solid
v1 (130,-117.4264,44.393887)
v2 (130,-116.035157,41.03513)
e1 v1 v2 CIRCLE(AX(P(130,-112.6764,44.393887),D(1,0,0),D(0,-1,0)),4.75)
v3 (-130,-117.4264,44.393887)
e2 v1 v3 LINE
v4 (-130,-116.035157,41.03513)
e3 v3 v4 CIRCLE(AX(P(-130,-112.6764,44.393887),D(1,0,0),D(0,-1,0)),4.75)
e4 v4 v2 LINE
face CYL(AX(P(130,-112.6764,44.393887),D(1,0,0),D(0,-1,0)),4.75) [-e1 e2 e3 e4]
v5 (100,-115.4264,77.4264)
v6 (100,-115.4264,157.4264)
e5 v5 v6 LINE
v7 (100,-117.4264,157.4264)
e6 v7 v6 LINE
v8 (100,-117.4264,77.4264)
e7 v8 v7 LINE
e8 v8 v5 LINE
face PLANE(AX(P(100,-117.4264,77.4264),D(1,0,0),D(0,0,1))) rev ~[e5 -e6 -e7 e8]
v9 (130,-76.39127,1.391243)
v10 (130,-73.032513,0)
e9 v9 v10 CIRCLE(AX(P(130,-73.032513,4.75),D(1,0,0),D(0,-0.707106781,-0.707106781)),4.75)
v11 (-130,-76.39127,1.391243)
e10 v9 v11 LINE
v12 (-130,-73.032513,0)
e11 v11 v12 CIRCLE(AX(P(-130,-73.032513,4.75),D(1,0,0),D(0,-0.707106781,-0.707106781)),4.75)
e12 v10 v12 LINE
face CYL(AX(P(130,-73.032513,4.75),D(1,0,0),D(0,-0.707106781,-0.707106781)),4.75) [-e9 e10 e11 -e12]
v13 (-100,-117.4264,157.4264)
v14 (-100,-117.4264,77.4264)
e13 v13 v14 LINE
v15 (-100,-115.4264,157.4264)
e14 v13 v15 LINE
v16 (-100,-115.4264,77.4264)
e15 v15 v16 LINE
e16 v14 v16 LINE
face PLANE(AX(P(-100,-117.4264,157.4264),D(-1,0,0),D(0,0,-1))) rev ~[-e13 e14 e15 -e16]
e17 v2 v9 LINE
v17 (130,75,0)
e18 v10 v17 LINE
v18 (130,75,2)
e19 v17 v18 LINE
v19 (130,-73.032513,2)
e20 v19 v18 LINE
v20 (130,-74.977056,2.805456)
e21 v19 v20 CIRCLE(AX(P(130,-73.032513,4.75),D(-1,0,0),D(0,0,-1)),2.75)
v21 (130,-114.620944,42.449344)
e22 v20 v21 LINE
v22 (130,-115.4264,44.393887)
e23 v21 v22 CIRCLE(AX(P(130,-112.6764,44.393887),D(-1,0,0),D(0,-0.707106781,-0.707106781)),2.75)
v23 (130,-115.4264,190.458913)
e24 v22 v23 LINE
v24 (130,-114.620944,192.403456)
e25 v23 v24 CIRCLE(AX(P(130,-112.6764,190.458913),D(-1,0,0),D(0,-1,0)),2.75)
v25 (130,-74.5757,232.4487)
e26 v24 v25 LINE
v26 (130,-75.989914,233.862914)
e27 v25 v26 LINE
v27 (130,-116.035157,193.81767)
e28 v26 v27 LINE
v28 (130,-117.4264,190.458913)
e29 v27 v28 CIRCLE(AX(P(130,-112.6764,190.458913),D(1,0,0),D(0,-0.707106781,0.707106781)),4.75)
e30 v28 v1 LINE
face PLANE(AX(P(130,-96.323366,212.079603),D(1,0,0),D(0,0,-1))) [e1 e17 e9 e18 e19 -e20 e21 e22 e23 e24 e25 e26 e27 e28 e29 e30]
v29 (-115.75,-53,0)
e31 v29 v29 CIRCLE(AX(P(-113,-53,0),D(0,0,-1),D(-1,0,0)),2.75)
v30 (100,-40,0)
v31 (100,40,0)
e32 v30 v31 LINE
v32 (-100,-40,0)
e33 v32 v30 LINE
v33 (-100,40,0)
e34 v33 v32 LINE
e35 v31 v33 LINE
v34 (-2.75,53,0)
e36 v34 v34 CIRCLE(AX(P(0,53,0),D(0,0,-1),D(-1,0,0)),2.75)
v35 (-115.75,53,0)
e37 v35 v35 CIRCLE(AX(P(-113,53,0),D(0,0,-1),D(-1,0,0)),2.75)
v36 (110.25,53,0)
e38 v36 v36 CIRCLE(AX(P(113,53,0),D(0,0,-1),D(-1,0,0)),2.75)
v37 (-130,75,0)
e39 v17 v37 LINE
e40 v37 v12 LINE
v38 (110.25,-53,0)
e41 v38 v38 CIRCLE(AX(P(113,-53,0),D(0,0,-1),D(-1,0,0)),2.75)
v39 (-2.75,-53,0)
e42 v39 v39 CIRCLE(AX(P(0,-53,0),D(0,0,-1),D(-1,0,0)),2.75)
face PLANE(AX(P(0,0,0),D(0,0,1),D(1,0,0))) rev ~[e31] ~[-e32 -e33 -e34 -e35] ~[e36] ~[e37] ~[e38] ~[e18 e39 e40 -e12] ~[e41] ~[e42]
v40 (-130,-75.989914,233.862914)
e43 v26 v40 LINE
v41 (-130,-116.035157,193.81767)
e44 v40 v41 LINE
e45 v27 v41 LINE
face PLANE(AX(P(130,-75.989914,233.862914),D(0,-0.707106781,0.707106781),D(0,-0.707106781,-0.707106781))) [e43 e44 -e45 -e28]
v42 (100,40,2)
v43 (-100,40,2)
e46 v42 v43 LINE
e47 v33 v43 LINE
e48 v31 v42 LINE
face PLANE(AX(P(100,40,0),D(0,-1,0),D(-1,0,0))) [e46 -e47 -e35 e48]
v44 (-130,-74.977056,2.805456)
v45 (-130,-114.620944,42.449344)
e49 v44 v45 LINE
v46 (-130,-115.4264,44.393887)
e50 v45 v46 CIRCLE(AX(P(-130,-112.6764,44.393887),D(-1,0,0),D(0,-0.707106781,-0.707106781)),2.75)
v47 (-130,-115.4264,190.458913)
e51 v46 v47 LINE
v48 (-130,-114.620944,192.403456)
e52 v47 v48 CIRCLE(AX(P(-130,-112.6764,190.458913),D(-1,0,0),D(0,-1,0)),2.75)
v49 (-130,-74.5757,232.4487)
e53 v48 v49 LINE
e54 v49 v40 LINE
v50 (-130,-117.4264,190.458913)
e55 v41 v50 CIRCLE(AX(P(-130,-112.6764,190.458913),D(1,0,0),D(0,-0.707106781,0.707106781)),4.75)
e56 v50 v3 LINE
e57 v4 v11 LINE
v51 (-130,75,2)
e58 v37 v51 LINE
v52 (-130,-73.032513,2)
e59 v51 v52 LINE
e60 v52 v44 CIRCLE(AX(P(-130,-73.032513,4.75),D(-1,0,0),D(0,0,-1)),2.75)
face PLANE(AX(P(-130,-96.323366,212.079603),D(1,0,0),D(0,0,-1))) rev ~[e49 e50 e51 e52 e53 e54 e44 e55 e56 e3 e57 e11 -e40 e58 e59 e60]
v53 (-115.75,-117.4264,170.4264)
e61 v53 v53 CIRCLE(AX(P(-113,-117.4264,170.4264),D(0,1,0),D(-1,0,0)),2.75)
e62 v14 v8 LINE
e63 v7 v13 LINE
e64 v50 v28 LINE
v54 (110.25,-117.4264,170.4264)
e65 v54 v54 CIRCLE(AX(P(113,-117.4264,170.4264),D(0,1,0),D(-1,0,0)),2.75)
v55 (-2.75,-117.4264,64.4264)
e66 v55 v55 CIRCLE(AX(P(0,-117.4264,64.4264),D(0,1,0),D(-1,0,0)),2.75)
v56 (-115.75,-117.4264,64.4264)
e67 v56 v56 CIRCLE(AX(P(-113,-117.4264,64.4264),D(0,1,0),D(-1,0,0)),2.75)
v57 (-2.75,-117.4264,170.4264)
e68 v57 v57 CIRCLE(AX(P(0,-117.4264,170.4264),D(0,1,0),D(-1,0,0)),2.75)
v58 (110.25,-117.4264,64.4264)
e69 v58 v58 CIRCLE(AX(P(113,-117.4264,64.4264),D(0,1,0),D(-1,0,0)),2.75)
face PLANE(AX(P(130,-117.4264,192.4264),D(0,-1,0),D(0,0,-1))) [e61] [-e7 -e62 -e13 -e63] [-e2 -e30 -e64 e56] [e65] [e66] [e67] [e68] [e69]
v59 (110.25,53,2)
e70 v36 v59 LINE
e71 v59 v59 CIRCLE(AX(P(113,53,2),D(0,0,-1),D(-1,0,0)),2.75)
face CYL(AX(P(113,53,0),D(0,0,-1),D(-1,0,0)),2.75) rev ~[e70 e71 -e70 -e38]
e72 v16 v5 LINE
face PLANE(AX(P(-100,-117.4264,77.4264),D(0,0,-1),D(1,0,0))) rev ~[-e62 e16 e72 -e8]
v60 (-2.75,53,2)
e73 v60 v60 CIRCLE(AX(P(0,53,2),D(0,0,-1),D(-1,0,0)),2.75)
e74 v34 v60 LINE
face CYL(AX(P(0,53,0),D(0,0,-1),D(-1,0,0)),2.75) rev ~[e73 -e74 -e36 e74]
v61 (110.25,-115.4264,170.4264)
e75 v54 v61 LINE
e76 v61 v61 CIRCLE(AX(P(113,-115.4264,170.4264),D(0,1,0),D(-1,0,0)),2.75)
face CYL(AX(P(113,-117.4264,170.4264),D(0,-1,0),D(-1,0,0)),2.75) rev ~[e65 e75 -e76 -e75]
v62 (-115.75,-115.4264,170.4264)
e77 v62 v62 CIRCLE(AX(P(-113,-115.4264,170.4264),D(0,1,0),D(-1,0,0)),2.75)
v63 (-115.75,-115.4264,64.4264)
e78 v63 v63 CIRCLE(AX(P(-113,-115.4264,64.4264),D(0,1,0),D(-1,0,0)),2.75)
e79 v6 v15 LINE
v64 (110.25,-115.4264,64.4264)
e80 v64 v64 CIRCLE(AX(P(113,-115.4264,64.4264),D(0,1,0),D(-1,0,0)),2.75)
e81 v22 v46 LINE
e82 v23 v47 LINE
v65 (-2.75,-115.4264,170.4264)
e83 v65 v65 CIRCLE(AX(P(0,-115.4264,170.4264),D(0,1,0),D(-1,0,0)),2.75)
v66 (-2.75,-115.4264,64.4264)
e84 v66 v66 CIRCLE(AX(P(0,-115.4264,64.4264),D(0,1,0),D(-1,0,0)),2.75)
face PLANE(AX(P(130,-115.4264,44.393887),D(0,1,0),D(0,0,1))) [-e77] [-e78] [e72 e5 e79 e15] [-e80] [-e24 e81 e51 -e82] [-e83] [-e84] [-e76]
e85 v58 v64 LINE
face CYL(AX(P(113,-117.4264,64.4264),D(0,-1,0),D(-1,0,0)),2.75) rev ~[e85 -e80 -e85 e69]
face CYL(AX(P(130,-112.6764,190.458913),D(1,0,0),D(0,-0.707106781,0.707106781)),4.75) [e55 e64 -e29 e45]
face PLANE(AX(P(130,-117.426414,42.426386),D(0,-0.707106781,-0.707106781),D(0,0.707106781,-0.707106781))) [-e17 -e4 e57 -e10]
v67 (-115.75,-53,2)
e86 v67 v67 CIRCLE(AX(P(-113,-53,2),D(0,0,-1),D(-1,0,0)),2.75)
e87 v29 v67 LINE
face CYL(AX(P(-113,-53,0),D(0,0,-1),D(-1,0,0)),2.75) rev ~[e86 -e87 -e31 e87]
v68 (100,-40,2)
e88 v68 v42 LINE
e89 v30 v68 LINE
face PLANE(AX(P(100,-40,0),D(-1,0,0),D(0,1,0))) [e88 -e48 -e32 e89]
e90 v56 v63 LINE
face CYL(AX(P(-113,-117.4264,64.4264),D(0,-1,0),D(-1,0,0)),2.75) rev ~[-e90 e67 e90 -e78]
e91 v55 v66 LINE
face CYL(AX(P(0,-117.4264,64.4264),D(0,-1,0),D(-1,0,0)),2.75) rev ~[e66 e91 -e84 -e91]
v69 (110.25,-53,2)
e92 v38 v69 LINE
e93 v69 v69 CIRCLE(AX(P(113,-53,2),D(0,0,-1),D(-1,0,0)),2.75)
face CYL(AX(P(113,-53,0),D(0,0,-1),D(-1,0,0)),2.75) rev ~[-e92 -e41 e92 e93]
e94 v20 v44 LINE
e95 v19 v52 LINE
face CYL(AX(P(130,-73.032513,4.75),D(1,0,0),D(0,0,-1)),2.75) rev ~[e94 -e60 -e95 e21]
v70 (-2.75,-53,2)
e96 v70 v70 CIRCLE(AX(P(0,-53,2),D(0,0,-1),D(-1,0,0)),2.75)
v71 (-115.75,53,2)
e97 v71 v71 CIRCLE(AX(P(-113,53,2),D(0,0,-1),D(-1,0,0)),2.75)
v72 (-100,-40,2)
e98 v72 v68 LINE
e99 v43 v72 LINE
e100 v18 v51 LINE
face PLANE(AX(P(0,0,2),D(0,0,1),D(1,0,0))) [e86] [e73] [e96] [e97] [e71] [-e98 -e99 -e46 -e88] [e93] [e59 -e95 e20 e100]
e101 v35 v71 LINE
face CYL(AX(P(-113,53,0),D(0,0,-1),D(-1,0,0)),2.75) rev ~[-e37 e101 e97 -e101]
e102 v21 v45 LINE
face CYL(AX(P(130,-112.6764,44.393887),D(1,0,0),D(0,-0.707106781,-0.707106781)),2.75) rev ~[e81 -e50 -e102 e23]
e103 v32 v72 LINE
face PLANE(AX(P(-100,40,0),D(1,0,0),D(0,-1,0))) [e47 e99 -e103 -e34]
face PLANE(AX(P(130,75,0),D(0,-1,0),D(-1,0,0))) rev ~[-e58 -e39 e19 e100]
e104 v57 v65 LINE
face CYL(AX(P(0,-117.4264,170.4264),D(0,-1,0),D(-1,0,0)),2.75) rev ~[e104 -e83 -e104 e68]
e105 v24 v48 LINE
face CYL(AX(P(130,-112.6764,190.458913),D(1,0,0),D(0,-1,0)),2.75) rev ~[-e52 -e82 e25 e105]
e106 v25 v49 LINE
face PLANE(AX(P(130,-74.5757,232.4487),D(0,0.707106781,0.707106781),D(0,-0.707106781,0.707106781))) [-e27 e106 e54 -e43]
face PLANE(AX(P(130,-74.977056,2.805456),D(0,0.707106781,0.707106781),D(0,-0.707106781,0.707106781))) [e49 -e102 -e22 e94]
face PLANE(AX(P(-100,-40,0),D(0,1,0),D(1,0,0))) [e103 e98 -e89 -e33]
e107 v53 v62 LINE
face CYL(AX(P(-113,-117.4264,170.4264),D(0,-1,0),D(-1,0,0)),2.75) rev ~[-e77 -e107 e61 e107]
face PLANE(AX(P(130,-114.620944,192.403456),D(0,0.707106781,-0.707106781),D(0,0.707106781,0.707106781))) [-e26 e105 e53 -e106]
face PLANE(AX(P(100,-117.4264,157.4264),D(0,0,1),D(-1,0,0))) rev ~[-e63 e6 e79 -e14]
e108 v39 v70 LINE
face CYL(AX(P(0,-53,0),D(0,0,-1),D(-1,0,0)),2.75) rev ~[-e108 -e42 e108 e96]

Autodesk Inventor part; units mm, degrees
ref_plane "YZ Plane" through (0, 0, 0) normal (1, 0, 0) x (0, 1, 0)
ref_plane "XZ Plane" through (0, 0, 0) normal (0, 1, 0) x (-1, 0, 0)
sketch "Sketch1" plane through (0, 0, 0) normal (0, 0, 1) x (1, 0, 0)
  line L0 (130, 75) -> (-130, 75)
  line L1 (-130, 75) -> (-130, -75)
  line L2 (-130, -75) -> (130, -75)
  line L3 (130, -75) -> (130, 75)
  line L4 (130, 75) -> (-130, -75) construction
  line L5 (-130, 75) -> (130, -75) construction
  line L6 (100, 40) -> (-100, 40)
  line L7 (-100, 40) -> (-100, -40)
  line L8 (-100, -40) -> (100, -40)
  line L9 (100, -40) -> (100, 40)
  line L10 (100, 40) -> (-100, -40) construction
  line L11 (-100, 40) -> (100, -40) construction
  point P0 (0, 0)
  point P1 (0, 0)
  point P2 (0, 0)
  point P3 (100, 0)
  point P4 (130, 0)
  dimension "d34" = 200
  dimension "d35" = 80
  dimension "d51" = 30
  dimension "d53" = 30
  dimension "d54" = 35
  dimension "d56" = 150
extrude "Plate1" add sketch "Sketch1" along normal blind 2
sketch "Sketch6" plane through (130, -73.5858, 1.4142) normal (0, -0.7071068, -0.7071068) x (1, 0, 0)
  line L0 (-260, 0) -> (0, 0)
  line L1 (0, 0) -> (0, 60)
  line L2 (0, 60) -> (-260, 60)
  line L3 (-260, 60) -> (-260, 0)
edge flange "Flange2" height 60 angle 45 thickness 2 bend radius 2.75 thickness toward (0, -0.7071068, -0.7071068) relief round relief width 2 relief depth 1 edges at (0, -75, 2) wall of the first edge with corners at (-130, -73.5858, 1.4142) (130, -73.5858, 1.4142) (130, -116.0122, 43.8406) (-130, -116.0122, 43.8406)
bend "Bend2"
corner "Corner2"
sketch "Sketch8" plane through (130, -115.4264, 42.4264) normal (0, -1, 0) x (1, 0, 0)
  line L0 (-260, 0) -> (0, 0)
  line L1 (0, 0) -> (0, 150)
  line L2 (0, 150) -> (-260, 150)
  line L3 (-260, 150) -> (-260, 0)
edge flange "Flange3" height 150 angle 45 thickness 2 bend radius 2.75 thickness toward (0, -1, 0) relief round relief width 2 relief depth 1 edges at (0, -116.0122, 43.8406) wall of the first edge with corners at (-130, -115.4264, 42.4264) (130, -115.4264, 42.4264) (130, -115.4264, 192.4264) (-130, -115.4264, 192.4264)
bend "Bend3"
corner "Corner3"
sketch "Sketch9" plane through (130, -116.0122, 191.0122) normal (0, -0.7071068, 0.7071068) x (1, 0, 0)
  line L0 (-260, 0) -> (0, 0)
  line L1 (0, 0) -> (0, 58.6)
  line L2 (0, 58.6) -> (-260, 58.6)
  line L3 (-260, 58.6) -> (-260, 0)
edge flange "Flange4" height 58.6 angle 45 thickness 2 bend radius 2.75 thickness toward (0, -0.7071068, 0.7071068) relief round relief width 2 relief depth 1 edges at (0, -115.4264, 192.4264) wall of the first edge with corners at (-130, -116.0122, 191.0122) (130, -116.0122, 191.0122) (130, -74.5757, 232.4487) (-130, -74.5757, 232.4487)
bend "Bend4"
corner "Corner4"
sketch "Sketch10" plane through (-130, -117.4264, 44.3939) normal (0, -1, 0) x (1, 0, 0)
  line L0 (260, 146.065) -> (0, 146.065) projected
  line L1 (0, 0) -> (0, 146.065) projected
  line L2 (0, 0) -> (260, 0) projected
  line L3 (260, 146.065) -> (260, 0) projected
  line L4 (30, 33.0325) -> (230, 33.0325)
  line L5 (230, 33.0325) -> (230, 113.0325)
  line L6 (230, 113.0325) -> (30, 113.0325)
  line L7 (30, 113.0325) -> (30, 33.0325)
  point P0 (130, -44.3939)
  point P1 (30, 73.0325)
  point P2 (0, 73.0325)
  dimension "d77" = 80
  dimension "d78" = 200
  dimension "d79" = 30
extrude "Cut3" cut sketch "Sketch10" against normal blind 2 contours L7 L6 L5 L4
sketch "Sketch11" plane through (0, 0, 0) normal (0, 0, -1) x (-1, 0, 0)
  line L0 (100, -40) -> (-100, -40) construction
  line L1 (-100, -40) -> (-100, 40) construction
  line L2 (-100, 40) -> (100, 40) construction
  line L3 (100, 40) -> (100, -40) construction
  circle A0 centre (0, -53) radius 2.75
  circle A1 centre (0, 53) radius 2.75
  line L4 (-100, 0) -> (100, 0) construction
  point P0 (0, 0)
  dimension "d82" = 106
  dimension "d83" = 5.5
extrude "Cut4" cut sketch "Sketch11" against normal blind 2
pattern_linear "Rectangular Pattern1" count 3 spacing 113 along (1, 0, 0) of "Cut4" first direction both ways yes
ref_plane "Work Plane1" through (0, -117.4264, 0) normal (0, 0.7071068, -0.7071068) x (1, 0, 0)
mirror "Mirror1" about plane through (0, -117.4264, 0) normal (0, 0.7071068, -0.7071068) of "Cut4", "Rectangular Pattern1"
equation "\"d34\" = MAIN_6_central_window_hight"
equation "\"d35\" = MAIN_7_central_window_width"
equation "\"d56\" = Wall_1_width"
equation "\"d77\" = MAIN_7_central_window_width"
equation "\"d78\" = MAIN_6_central_window_hight"
equation "\"d79\" = d53"
equation "\"d80\" = Thickness"
equation "\"d84\" = Thickness"
equation "\"d2\" = Thickness"
equation "\"d36\" = BendReliefWidth"
equation "\"d37\" = BendReliefDepth"
equation "\"d38\" = MinimumRemnant"
equation "\"d39\" = TransitionRadius"
equation "\"d40\" = Wall_2_width"
equation "\"d42\" = BendRadius"
equation "\"d43\" = CornerReliefSize"
equation "\"d44\" = GapSize"
equation "\"d45\" = JacobiRadiusSize"
equation "\"d57\" = BendReliefWidth"
equation "\"d58\" = BendReliefDepth"
equation "\"d59\" = MinimumRemnant"
equation "\"d60\" = TransitionRadius"
equation "\"d61\" = d56"
equation "\"d63\" = BendRadius"
equation "\"d64\" = CornerReliefSize"
equation "\"d65\" = GapSize"
equation "\"d66\" = JacobiRadiusSize"
equation "\"d67\" = BendReliefWidth"
equation "\"d68\" = BendReliefDepth"
equation "\"d69\" = MinimumRemnant"
equation "\"d70\" = TransitionRadius"
equation "\"d71\" = Wall_2_width - 0.7 * Thickness"
equation "\"d73\" = BendRadius"
equation "\"d74\" = CornerReliefSize"
equation "\"d75\" = GapSize"
equation "\"d76\" = JacobiRadiusSize"
equation "\"BendReliefWidth\" = Thickness"
equation "\"BendReliefDepth\" = 0.5 * Thickness"
equation "\"CornerReliefSize\" = 4 * Thickness"
equation "\"MinimumRemnant\" = 2 * Thickness"
equation "\"TransitionRadius\" = BendRadius"
equation "\"JacobiRadiusSize\" = BendRadius"
equation "\"GapSize\" = Thickness"
equation "\"MAIN_6_central_window_hight\" = 200"
equation "\"MAIN_7_central_window_width\" = 80"
equation "\"Wall_1_width\" = 150"
equation "\"Thickness\" = 2"
equation "\"Wall_2_width\" = 60"
equation "\"BendRadius\" = 2.75"
properties part number "ANP 1454 BOTTOM DS box wall 1" material "Stainless Steel"
